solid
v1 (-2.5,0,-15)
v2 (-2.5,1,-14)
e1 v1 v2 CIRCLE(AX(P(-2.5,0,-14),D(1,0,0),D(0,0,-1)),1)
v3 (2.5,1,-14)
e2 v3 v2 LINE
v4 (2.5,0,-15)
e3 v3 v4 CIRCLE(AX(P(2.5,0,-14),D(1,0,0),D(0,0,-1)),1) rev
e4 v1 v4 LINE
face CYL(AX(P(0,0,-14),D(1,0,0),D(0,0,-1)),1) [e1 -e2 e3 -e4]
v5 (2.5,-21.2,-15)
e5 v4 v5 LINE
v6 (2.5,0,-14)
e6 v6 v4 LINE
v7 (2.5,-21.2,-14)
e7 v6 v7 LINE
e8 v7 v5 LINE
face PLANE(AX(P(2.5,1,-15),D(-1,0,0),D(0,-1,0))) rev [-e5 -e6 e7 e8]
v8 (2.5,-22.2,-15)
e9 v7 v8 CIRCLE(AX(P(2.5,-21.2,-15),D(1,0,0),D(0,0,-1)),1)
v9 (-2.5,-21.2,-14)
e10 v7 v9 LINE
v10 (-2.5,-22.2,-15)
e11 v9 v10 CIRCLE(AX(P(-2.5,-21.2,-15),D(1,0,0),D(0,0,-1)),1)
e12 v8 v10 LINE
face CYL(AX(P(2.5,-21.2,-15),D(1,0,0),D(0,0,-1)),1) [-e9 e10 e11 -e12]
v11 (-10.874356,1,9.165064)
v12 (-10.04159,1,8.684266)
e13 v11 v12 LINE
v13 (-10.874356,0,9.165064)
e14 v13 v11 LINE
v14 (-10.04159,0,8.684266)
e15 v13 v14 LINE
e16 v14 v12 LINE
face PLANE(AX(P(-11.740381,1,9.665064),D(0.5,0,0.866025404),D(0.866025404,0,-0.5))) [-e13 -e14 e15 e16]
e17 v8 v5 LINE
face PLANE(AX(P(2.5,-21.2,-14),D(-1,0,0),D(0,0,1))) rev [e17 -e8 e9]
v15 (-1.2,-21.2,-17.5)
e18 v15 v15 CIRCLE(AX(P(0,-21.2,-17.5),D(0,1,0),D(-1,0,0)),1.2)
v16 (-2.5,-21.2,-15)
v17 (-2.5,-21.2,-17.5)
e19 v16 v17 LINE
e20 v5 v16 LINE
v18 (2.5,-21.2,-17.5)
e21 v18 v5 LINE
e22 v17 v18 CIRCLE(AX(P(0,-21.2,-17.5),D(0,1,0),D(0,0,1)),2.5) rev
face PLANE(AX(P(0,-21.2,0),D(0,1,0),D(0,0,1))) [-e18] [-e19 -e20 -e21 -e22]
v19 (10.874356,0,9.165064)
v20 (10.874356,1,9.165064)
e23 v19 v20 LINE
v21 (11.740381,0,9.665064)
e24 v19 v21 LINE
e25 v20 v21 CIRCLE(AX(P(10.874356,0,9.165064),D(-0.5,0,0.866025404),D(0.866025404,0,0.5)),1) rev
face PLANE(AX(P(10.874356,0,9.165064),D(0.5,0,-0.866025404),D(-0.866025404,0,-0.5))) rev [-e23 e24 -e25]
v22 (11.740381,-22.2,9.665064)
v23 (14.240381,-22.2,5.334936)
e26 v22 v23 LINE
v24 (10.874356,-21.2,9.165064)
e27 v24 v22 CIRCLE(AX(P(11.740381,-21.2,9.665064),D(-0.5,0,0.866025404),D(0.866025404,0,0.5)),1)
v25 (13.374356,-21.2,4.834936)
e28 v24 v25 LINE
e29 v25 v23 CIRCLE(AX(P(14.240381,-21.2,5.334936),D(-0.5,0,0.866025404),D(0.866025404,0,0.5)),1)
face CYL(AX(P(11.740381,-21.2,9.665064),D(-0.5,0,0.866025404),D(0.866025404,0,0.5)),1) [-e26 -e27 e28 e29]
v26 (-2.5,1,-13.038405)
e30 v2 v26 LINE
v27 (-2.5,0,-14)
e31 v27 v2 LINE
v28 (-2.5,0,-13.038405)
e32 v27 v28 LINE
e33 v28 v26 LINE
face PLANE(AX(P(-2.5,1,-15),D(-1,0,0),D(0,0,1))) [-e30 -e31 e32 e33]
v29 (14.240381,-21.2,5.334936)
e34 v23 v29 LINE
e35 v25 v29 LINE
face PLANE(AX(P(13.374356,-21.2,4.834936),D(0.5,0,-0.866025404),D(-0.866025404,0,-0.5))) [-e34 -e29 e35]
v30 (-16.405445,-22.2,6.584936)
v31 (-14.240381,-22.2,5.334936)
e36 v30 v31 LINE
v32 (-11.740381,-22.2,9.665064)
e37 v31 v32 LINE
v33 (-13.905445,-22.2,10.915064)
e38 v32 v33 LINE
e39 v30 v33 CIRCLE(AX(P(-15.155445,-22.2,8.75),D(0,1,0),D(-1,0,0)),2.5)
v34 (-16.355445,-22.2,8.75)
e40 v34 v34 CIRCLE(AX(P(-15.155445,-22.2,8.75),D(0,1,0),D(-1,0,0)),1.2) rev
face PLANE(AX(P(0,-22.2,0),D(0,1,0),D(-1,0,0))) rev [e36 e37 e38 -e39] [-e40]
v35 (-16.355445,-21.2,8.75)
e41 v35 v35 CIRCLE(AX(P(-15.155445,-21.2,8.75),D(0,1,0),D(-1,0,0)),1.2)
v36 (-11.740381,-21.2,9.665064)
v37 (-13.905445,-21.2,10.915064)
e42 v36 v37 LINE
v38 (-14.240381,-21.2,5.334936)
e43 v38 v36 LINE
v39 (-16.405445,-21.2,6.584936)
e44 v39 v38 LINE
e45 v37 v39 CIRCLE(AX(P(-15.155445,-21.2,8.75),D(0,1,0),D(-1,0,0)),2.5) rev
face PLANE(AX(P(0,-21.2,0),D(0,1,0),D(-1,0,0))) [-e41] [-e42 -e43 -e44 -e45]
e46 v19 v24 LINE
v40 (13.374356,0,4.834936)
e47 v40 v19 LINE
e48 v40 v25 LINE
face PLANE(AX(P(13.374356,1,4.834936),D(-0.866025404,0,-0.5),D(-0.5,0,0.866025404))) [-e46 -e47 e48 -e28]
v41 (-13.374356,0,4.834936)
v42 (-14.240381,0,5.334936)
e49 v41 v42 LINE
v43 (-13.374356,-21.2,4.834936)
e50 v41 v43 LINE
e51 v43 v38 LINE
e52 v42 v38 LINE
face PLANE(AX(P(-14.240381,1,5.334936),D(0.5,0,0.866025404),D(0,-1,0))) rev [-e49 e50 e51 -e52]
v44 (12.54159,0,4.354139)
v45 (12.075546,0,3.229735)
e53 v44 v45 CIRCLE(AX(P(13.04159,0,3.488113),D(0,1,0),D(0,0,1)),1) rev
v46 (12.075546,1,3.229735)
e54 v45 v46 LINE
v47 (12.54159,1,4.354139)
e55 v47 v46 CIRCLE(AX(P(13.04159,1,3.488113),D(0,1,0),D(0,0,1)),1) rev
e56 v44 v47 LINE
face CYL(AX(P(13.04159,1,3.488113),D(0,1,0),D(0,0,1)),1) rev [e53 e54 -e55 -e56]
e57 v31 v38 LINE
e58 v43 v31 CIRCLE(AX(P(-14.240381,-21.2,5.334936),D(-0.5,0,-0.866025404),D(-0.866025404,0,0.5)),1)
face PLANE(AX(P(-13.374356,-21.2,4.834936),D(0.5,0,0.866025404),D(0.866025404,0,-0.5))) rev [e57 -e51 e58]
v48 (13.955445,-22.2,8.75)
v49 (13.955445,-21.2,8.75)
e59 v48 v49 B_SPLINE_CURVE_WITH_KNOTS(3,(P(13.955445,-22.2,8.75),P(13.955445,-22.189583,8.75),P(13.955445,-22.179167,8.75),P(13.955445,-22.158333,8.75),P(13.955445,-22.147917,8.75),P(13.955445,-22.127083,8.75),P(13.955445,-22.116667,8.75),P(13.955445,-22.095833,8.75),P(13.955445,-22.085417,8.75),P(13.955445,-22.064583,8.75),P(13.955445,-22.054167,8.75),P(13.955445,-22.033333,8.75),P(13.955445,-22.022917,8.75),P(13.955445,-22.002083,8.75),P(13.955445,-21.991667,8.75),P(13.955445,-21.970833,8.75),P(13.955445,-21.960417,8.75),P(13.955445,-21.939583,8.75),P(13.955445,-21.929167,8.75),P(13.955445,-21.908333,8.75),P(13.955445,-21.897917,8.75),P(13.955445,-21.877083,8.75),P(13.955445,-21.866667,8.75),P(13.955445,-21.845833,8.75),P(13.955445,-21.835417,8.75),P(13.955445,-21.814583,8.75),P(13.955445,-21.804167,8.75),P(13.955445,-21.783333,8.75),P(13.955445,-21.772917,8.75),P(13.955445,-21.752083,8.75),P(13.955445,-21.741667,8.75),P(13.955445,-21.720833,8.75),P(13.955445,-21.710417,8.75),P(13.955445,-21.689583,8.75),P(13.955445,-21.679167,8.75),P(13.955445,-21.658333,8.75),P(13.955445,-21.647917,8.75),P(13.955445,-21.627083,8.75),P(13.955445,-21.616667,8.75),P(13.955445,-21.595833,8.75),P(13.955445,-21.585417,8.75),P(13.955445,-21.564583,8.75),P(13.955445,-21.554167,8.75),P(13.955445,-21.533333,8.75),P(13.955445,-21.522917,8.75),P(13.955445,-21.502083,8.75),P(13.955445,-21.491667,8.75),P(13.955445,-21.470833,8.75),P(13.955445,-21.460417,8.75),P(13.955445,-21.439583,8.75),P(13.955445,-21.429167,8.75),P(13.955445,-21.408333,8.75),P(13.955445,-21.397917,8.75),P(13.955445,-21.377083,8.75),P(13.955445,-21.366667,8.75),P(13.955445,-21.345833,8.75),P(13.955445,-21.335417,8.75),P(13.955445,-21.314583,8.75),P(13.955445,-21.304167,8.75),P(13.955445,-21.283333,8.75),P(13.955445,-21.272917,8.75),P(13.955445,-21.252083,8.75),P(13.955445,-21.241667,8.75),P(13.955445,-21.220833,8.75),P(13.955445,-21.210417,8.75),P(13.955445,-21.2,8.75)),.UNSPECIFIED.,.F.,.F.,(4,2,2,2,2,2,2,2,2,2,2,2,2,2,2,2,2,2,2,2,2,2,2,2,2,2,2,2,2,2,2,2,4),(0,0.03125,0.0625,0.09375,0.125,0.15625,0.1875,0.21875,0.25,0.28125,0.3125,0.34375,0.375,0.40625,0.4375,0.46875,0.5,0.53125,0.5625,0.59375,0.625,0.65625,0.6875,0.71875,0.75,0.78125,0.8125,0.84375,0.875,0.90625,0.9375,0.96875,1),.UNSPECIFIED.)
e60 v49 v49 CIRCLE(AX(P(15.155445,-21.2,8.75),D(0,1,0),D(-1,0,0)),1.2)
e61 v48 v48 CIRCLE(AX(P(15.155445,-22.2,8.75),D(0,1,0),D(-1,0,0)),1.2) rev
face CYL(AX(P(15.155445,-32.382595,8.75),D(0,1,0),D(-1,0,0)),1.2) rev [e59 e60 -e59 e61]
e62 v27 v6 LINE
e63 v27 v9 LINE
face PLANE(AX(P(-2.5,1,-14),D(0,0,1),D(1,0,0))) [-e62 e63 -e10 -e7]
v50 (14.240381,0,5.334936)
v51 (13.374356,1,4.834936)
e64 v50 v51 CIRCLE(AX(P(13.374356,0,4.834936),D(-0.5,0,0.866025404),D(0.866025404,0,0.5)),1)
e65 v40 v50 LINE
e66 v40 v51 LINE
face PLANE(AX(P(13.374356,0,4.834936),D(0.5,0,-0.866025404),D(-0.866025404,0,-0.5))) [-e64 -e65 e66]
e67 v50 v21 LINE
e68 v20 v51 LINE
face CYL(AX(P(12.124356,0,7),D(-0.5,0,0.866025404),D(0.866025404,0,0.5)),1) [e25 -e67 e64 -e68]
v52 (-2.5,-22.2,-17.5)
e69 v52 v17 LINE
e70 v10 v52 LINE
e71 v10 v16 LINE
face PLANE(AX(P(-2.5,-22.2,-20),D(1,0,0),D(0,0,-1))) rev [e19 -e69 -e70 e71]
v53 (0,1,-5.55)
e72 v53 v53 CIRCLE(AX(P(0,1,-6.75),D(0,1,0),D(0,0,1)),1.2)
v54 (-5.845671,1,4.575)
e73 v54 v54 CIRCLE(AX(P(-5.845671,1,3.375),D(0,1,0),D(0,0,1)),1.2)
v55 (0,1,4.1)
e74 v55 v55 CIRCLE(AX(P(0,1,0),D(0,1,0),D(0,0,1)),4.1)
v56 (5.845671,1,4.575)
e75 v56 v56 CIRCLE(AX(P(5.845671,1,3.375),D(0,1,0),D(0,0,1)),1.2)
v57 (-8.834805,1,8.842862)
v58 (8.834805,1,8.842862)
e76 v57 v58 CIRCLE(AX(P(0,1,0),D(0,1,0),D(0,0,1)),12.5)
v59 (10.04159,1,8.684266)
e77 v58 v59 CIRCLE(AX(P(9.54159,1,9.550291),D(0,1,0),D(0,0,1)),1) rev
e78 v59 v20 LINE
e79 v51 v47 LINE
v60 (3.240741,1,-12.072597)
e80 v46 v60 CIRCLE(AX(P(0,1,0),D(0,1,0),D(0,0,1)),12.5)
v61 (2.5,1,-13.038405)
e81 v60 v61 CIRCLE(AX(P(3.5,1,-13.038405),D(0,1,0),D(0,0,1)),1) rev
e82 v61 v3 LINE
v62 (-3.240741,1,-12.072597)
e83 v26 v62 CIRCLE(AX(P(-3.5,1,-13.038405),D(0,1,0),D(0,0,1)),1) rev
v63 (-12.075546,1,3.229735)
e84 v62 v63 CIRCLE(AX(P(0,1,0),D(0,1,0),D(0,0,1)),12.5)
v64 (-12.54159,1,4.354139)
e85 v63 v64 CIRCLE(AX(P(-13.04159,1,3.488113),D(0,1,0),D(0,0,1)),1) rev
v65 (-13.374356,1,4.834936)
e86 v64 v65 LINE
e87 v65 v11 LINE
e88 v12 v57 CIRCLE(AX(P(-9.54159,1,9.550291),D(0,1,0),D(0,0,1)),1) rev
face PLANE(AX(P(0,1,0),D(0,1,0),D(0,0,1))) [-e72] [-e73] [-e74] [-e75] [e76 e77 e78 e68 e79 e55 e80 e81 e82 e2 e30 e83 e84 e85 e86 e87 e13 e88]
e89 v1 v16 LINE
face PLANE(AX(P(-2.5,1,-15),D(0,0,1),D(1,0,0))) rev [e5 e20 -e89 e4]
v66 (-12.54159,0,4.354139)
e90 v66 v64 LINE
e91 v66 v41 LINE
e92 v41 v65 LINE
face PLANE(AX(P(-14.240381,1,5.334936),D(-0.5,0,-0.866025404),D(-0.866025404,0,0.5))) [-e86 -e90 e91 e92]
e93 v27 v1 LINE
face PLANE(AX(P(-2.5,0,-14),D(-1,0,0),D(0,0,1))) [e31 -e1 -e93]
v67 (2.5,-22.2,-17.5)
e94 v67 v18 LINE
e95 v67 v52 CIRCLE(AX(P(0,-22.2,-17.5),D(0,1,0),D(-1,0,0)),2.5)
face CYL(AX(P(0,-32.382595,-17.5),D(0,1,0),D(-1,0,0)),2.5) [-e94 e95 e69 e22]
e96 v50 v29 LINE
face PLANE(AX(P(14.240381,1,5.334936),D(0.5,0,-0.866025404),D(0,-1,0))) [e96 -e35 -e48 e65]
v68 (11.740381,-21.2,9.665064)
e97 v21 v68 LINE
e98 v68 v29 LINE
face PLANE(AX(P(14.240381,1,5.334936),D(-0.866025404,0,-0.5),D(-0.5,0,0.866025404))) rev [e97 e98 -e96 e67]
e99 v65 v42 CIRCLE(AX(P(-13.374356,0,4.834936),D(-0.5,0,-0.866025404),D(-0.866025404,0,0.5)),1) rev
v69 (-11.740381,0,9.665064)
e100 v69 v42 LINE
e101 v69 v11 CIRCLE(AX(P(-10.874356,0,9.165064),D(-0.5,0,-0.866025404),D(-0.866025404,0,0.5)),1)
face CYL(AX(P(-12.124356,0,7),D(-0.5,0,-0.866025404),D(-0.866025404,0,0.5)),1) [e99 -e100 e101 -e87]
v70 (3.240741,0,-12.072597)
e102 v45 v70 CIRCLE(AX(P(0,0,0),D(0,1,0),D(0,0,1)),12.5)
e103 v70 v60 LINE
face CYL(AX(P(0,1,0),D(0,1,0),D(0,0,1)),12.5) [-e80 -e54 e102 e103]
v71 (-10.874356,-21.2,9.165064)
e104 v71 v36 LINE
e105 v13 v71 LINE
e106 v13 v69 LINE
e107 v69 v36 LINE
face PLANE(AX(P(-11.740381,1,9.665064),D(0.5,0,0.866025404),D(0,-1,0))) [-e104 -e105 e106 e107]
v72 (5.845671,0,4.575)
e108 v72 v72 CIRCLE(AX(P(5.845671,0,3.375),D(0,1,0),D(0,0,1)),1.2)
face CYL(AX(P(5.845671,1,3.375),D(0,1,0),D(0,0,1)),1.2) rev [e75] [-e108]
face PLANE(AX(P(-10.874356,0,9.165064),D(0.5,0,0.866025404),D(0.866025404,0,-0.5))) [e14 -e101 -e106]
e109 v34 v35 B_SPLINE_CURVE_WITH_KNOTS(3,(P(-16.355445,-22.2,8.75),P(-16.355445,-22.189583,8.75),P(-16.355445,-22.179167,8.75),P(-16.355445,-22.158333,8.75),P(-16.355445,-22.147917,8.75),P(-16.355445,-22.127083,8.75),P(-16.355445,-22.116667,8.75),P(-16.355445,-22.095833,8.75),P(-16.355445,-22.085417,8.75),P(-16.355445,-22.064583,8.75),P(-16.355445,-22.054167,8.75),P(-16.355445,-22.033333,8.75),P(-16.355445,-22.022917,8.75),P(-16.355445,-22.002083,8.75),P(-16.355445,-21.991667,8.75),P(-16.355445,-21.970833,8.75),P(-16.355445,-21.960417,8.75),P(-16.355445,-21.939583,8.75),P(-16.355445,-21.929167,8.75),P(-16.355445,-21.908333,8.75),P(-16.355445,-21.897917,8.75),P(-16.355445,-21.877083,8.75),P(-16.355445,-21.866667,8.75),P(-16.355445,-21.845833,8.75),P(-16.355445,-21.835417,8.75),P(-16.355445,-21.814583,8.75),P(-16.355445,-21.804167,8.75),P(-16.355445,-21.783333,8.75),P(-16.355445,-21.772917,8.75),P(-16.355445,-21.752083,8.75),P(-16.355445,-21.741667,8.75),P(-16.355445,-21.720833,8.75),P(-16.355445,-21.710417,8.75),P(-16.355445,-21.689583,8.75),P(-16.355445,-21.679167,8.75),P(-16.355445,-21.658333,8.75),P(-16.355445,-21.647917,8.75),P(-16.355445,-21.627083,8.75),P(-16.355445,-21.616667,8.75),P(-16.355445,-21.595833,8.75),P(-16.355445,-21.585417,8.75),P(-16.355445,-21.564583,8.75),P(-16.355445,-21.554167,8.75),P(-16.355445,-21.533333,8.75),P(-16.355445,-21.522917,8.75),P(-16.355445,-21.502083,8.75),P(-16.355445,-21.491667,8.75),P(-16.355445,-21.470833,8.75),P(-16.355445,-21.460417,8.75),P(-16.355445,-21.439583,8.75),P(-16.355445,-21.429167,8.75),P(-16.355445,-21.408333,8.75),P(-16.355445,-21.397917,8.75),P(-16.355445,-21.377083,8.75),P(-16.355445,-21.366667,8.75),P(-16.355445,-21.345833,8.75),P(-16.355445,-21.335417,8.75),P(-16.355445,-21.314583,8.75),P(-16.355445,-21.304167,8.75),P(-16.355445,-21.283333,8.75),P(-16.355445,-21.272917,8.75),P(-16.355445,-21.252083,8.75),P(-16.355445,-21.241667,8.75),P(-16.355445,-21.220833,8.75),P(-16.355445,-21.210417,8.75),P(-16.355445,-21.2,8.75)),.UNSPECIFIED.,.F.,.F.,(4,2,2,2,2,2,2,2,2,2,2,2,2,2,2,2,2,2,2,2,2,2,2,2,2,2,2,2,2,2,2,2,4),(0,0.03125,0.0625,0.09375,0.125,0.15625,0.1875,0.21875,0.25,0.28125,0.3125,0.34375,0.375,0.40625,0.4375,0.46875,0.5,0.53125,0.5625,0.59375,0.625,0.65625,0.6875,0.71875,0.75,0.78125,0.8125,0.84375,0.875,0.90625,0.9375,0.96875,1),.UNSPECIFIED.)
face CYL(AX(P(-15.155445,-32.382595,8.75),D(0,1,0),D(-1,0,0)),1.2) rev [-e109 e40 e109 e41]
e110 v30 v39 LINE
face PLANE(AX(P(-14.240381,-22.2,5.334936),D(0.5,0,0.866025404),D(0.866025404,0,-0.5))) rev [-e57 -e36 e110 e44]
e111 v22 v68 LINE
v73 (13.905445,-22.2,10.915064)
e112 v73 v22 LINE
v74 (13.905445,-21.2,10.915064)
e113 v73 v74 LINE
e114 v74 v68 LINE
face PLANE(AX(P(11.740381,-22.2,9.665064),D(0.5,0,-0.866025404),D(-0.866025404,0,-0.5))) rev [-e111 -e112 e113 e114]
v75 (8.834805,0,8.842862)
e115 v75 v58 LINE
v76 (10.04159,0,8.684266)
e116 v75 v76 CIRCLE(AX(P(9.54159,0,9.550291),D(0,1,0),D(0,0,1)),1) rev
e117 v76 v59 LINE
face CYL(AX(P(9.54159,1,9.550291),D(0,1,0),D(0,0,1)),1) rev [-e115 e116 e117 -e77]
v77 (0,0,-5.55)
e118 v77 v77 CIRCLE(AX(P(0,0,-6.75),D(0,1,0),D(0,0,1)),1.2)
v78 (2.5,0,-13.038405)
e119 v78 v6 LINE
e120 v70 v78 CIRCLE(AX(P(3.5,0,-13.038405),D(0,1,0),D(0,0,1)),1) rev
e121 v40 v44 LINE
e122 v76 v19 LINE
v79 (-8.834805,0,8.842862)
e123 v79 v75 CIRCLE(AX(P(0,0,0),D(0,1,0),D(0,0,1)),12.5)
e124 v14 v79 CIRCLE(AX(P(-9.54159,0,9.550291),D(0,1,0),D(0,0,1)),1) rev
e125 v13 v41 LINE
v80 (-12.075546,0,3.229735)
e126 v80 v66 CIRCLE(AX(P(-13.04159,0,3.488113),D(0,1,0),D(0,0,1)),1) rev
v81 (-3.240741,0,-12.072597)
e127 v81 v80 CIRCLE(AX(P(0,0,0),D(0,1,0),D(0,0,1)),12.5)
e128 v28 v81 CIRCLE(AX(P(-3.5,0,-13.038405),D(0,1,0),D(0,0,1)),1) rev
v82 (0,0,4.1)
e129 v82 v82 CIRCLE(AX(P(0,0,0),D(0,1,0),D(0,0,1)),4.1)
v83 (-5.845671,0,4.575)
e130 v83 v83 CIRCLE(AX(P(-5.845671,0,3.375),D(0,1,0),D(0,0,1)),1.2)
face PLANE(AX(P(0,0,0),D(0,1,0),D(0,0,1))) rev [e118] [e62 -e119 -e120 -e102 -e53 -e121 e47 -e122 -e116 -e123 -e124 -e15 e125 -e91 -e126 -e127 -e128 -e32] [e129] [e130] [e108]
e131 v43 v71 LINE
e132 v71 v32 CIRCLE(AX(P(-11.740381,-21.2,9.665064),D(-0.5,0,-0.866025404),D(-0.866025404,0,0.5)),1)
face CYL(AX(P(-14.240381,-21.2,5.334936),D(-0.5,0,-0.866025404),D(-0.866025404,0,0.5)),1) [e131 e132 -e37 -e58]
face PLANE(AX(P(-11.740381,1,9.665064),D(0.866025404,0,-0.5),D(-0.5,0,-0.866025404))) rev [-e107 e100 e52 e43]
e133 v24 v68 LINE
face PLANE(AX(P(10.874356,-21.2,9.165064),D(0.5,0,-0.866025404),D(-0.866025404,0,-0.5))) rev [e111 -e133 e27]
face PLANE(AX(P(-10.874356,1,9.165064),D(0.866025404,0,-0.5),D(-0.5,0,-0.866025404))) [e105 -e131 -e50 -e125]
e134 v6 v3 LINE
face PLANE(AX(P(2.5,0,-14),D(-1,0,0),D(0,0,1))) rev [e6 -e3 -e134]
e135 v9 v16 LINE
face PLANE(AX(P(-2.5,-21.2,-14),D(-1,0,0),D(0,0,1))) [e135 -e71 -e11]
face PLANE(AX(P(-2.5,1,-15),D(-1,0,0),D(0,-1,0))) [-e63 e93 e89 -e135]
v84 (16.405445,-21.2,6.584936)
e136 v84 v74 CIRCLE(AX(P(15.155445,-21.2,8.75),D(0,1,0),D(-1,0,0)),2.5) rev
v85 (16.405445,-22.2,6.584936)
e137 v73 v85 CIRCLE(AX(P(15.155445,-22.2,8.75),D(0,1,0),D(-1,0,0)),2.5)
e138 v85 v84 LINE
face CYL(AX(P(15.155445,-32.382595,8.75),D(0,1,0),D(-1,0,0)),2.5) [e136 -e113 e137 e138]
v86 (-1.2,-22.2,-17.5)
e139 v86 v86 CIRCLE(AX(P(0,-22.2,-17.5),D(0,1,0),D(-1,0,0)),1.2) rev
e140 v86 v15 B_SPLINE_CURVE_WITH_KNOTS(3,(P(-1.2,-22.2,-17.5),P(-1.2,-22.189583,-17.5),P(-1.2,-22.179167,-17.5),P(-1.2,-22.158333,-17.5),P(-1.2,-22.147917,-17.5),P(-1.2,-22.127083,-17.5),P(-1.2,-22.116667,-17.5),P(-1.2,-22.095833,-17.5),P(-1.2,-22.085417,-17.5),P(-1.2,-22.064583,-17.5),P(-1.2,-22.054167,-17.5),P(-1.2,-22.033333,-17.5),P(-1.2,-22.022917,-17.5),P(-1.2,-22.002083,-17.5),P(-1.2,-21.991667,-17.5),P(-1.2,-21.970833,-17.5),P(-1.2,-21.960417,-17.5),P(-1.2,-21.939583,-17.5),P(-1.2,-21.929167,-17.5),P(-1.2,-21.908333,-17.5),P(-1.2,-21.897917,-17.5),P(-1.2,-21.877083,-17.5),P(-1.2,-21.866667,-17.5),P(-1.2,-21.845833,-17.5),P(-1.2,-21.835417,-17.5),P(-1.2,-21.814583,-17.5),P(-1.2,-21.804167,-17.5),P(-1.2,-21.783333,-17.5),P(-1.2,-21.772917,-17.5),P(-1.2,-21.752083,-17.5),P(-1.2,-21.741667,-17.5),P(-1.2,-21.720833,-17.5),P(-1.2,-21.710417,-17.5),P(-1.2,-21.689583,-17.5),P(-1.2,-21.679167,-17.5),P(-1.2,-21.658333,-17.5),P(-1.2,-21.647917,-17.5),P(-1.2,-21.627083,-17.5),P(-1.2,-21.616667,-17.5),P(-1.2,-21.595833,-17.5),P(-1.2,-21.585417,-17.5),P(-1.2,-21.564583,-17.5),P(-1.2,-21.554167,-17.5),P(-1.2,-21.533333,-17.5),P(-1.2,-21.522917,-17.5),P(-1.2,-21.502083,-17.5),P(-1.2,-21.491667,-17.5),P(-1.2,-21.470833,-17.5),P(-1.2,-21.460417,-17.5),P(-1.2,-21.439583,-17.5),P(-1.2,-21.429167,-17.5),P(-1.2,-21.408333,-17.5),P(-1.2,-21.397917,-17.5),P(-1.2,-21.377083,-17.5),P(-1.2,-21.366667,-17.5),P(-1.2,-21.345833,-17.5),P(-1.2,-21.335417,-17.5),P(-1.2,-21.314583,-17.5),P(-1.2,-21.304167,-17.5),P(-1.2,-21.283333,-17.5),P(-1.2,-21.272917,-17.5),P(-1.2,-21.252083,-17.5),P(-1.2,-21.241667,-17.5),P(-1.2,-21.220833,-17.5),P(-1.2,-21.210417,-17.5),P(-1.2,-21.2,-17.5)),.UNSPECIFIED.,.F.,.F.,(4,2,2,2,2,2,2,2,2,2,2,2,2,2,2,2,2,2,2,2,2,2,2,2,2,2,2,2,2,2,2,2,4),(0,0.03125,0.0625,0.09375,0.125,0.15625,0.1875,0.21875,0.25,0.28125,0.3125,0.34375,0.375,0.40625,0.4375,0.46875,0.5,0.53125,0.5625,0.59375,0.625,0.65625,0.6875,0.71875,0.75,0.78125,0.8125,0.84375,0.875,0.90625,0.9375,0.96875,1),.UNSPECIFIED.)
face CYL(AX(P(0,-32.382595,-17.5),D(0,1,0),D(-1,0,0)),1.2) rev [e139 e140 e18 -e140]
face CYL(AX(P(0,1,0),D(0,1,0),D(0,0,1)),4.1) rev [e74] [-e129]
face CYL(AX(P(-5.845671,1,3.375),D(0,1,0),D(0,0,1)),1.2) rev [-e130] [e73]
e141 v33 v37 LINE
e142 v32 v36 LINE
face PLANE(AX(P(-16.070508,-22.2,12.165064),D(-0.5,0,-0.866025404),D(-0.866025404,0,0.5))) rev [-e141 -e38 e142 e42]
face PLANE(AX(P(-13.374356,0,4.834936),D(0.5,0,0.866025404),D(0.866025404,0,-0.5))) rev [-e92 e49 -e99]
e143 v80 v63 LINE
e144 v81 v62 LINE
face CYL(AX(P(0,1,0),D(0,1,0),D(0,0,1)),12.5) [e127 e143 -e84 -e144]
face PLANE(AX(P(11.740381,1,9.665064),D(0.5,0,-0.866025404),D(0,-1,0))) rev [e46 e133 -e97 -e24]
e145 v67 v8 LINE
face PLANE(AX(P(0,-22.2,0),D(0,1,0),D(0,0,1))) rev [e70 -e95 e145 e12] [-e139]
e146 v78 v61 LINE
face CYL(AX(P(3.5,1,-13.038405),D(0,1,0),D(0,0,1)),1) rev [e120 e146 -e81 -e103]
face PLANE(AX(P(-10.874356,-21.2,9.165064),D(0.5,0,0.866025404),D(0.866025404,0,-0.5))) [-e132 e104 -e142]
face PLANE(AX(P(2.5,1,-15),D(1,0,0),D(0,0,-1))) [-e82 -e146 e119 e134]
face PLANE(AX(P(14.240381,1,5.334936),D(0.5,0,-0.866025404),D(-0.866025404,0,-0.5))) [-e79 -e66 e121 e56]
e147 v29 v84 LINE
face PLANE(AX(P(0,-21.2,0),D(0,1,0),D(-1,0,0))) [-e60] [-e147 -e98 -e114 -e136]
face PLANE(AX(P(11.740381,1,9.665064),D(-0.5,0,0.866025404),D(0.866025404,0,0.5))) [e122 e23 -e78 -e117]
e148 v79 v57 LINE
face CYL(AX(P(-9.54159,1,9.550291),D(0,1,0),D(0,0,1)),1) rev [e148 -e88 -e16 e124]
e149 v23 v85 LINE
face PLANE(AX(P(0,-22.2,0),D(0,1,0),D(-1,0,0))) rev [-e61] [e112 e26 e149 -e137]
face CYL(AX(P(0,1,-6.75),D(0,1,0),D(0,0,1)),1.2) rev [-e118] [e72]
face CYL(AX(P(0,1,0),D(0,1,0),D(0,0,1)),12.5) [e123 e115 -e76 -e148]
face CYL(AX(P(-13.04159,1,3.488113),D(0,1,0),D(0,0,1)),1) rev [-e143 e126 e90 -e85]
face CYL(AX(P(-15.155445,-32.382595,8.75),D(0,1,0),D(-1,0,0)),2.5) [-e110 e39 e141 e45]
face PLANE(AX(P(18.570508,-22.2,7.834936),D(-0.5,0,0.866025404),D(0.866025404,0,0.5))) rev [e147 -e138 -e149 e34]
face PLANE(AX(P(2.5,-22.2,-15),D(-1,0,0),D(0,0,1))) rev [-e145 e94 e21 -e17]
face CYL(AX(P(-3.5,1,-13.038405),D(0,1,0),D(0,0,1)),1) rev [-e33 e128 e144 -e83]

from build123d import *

# Parameters (mm, degrees)
ESBO_O1_R                  = 4.1
ESBO_O1_R_2                = 1.2
RESSALTO_EXTRUS_O1_DEPTH   = 1
ESBO_O2_W                  = 5
ESBO_O2_H                  = 1
RESSALTO_EXTRUS_O2_DEPTH   = 22.2
ESBO_O3_R                  = 1.2
RESSALTO_EXTRUS_O3_DEPTH   = 1
FILETE1_R                  = 1
CONVERT_SOLID4_OUTLINE_R   = 1.2
CONVERT_SOLID4_OUTLINE_R_2 = 4.1
CONVERT_SOLID4_DEPTH       = 1
CONVERT_SOLID4_START       = -21.2
CONVERT_SOLID4_2_OUTLINE_W = 5
CONVERT_SOLID4_2_OUTLINE_H = 1
CONVERT_SOLID4_2_DEPTH     = 21.2
CONVERT_SOLID4_START_2     = -2.5
CONVERT_SOLID4_3_DEPTH     = 5
CONVERT_SOLID4_4_DEPTH     = 4.999999999
CONVERT_SOLID4_5_DEPTH     = 5
CUT_EXTRUDE1_START         = -1
SKETCH18_R                 = 1.2
CUT_EXTRUDE1_DEPTH         = 1


with BuildPart() as part:
    # Esboço1 → Ressalto-extrusão1 (new body)
    with BuildSketch(Plane(origin=(0, 0, 0), x_dir=(1, 0, 0), z_dir=(0, 1, 0))):
        with BuildLine():
            Line((-2.5, 15), (-2.5, 12.247448714))
            ThreePointArc((-2.5, 12.247448714), (-10.825317547, 6.25), (-11.856601718, -3.958660847))
            Line((-11.856601718, -3.958660847), (-14.240381057, -5.334936491))
            Line((-14.240381057, -5.334936491), (-11.740381057, -9.665063509))
            Line((-11.740381057, -9.665063509), (-9.356601718, -8.288787866))
            ThreePointArc((-9.356601718, -8.288787866), (0, -12.5), (9.356601718, -8.288787866))
            Line((9.356601718, -8.288787866), (11.740381057, -9.665063509))
            Line((11.740381057, -9.665063509), (14.240381057, -5.334936491))
            Line((14.240381057, -5.334936491), (11.856601718, -3.958660847))
            ThreePointArc((11.856601718, -3.958660847), (10.825317547, 6.25), (2.5, 12.247448714))
            Line((2.5, 12.247448714), (2.5, 15))
            Line((2.5, 15), (-2.5, 15))
        make_face()
        with Locations(Location((0, 0, 0), (0, 0, 270))):
            Circle(ESBO_O1_R, mode=Mode.SUBTRACT)
        with Locations(Location((0, 6.75, 0), (0, 0, 270))):
            Circle(ESBO_O1_R_2, mode=Mode.SUBTRACT)
        with Locations(Location((5.845671476, -3.375, 0), (0, 0, 270))):
            Circle(ESBO_O1_R_2, mode=Mode.SUBTRACT)
        with Locations(Location((-5.845671476, -3.375, 0), (0, 0, 270))):
            Circle(ESBO_O1_R_2, mode=Mode.SUBTRACT)
    extrude(amount=RESSALTO_EXTRUS_O1_DEPTH)

    # Esboço2 → Ressalto-extrusão2 (add)
    with BuildSketch(Plane.XZ):
        with Locations((0, -14.5)):
            Rectangle(ESBO_O2_W, ESBO_O2_H)
        Polygon((-10.874355653, 9.165063509), (-11.740381057, 9.665063509), (-14.240381057, 5.334936491), (-13.374355653, 4.834936491), align=None)
        Polygon((13.374355653, 4.834936491), (14.240381057, 5.334936491), (11.740381057, 9.665063509), (10.874355653, 9.165063509), align=None)
    extrude(amount=RESSALTO_EXTRUS_O2_DEPTH)

    # Esboço3 → Ressalto-extrusão3 (add)
    # profile 1 of 3: a face of its own
    with BuildSketch(Plane.XZ.offset(22.2)):
        with BuildLine():
            Line((2.5, -15), (2.5, -17.5))
            ThreePointArc((2.5, -17.5), (0, -20), (-2.5, -17.5))
            Line((-2.5, -17.5), (-2.5, -15))
            Line((-2.5, -15), (2.5, -15))
        make_face()
        with Locations(Location((0, -17.5, 0), (0, 0, 270))):
            Circle(ESBO_O3_R, mode=Mode.SUBTRACT)
    # profile 2 of 3: a face of its own
    with BuildSketch(Plane.XZ.offset(22.2)):
        with BuildLine():
            Line((-11.740381057, 9.665063509), (-13.905444566, 10.915063509))
            ThreePointArc((-13.905444566, 10.915063509), (-17.320508076, 10), (-16.405444566, 6.584936491))
            Line((-16.405444566, 6.584936491), (-14.240381057, 5.334936491))
            Line((-14.240381057, 5.334936491), (-11.740381057, 9.665063509))
        make_face()
        with Locations(Location((-15.155444566, 8.75, 0), (0, 0, 270))):
            Circle(ESBO_O3_R, mode=Mode.SUBTRACT)
    # profile 3 of 3: a face of its own
    with BuildSketch(Plane.XZ.offset(22.2)):
        with BuildLine():
            Line((14.240381057, 5.334936491), (16.405444566, 6.584936491))
            ThreePointArc((16.405444566, 6.584936491), (17.320508076, 10), (13.905444566, 10.915063509))
            Line((13.905444566, 10.915063509), (11.740381057, 9.665063509))
            Line((11.740381057, 9.665063509), (14.240381057, 5.334936491))
        make_face()
        with Locations(Location((15.155444566, 8.75, 0), (0, 0, 270))):
            Circle(ESBO_O3_R, mode=Mode.SUBTRACT)
    extrude(amount=-RESSALTO_EXTRUS_O3_DEPTH)

    # Filete1
    filete1_edges = [part.edges().sort_by_distance(p)[0] for p in [
        (11.856601718, 0.5, 3.958660847),
        (2.5, 0.5, -12.247448714),
        (-2.5, 0.5, -12.247448714),
        (-11.856601718, 0.5, 3.958660847),
        (9.356601718, 0.5, 8.288787866),
        (-9.356601718, 0.5, 8.288787866),
    ]]
    fillet(filete1_edges, radius=FILETE1_R)


with BuildPart() as body_2:
    # Convert-Solid4: read off the stored shape, not the designer's step
    # Convert-Solid4 outline → Convert-Solid4 (new body)
    with BuildSketch(Plane(origin=(0, 0, 0), x_dir=(1, 0, 0), z_dir=(0, 1, 0))):
        with BuildLine():
            Line((2.5, 14), (-2.5, 14))
            Line((-2.5, 14), (-2.5, 13.03840481))
            ThreePointArc((-2.5, 13.03840481), (-2.706507952, 12.429824191), (-3.240740741, 12.072597047))
            ThreePointArc((-3.240740741, 12.072597047), (-10.825317547, 6.25), (-12.075546102, -3.229734715))
            ThreePointArc((-12.075546102, -3.229734715), (-12.11779749, -3.871007453), (-12.541589791, -4.354138896))
            Line((-12.541589791, -4.354138896), (-13.374355653, -4.834936491))
            Line((-13.374355653, -4.834936491), (-10.874355653, -9.165063509))
            Line((-10.874355653, -9.165063509), (-10.041589791, -8.684265915))
            ThreePointArc((-10.041589791, -8.684265915), (-9.411289538, -8.558816738), (-8.834805362, -8.842862332))
            ThreePointArc((-8.834805362, -8.842862332), (0, -12.5), (8.834805362, -8.842862332))
            ThreePointArc((8.834805362, -8.842862332), (9.411289538, -8.558816738), (10.041589791, -8.684265915))
            Line((10.041589791, -8.684265915), (10.874355653, -9.165063509))
            Line((10.874355653, -9.165063509), (13.374355653, -4.834936491))
            Line((13.374355653, -4.834936491), (12.541589791, -4.354138896))
            ThreePointArc((12.541589791, -4.354138896), (12.11779749, -3.871007453), (12.075546102, -3.229734715))
            ThreePointArc((12.075546102, -3.229734715), (10.825317547, 6.25), (3.240740741, 12.072597047))
            ThreePointArc((3.240740741, 12.072597047), (2.706507952, 12.429824191), (2.5, 13.03840481))
            Line((2.5, 13.03840481), (2.5, 14))
        make_face()
        with Locations((-5.845671476, -3.375)):
            Circle(CONVERT_SOLID4_OUTLINE_R, mode=Mode.SUBTRACT)
        Circle(CONVERT_SOLID4_OUTLINE_R_2, mode=Mode.SUBTRACT)
        with Locations((5.845671476, -3.375)):
            Circle(CONVERT_SOLID4_OUTLINE_R, mode=Mode.SUBTRACT)
        with Locations((0, 6.75)):
            Circle(CONVERT_SOLID4_OUTLINE_R, mode=Mode.SUBTRACT)
    extrude(amount=CONVERT_SOLID4_DEPTH)

    # Convert-Solid4 2 outline → Convert-Solid4 2 (add)
    with BuildSketch(Plane(origin=(0, 0, 0), x_dir=(1, 0, 0), z_dir=(0, 1, 0)).offset(CONVERT_SOLID4_START)):
        with Locations((0, 14.5)):
            Rectangle(CONVERT_SOLID4_2_OUTLINE_W, CONVERT_SOLID4_2_OUTLINE_H)
        Polygon((-10.874355653, -9.165063509), (-13.374355653, -4.834936491), (-14.240381057, -5.334936491), (-11.740381057, -9.665063509), align=None)
        Polygon((14.240381057, -5.334936491), (13.374355653, -4.834936491), (10.874355653, -9.165063509), (11.740381057, -9.665063509), align=None)
    extrude(amount=CONVERT_SOLID4_2_DEPTH)

    # Convert-Solid4 3 outline → Convert-Solid4 3 (add)
    with BuildSketch(Plane.YZ.offset(CONVERT_SOLID4_START_2)):
        with BuildLine():
            Line((0, -14), (0, -15))
            ThreePointArc((0, -15), (0.707106781, -14.707106781), (1, -14))
            Line((1, -14), (0, -14))
        make_face()
    extrude(amount=CONVERT_SOLID4_3_DEPTH)

    # Convert-Solid4 4 outline → Convert-Solid4 4 (add)
    with BuildSketch(Plane(origin=(0, 0, 0), x_dir=(0.866025403784438, 0, -0.500000000000001), z_dir=(0.500000000000001, 0, 0.866025403784438)).offset(CONVERT_SOLID4_START_2)):
        with BuildLine():
            ThreePointArc((-14, 1), (-14.707106781, 0.707106781), (-15, 0))
            Line((-15, 0), (-14, 0))
            Line((-14, 0), (-14, 1))
        make_face()
    extrude(amount=CONVERT_SOLID4_4_DEPTH)

    # Convert-Solid4 5 outline → Convert-Solid4 5 (add)
    with BuildSketch(Plane(origin=(0, 0, 0), x_dir=(0.8660254037844386, 0, 0.4999999999999999), z_dir=(0.4999999999999999, 0, -0.8660254037844388)).offset(CONVERT_SOLID4_START_2)):
        with BuildLine():
            ThreePointArc((14, -1), (14.707106781, -0.707106781), (15, 0))
            Line((15, 0), (14, 0))
            Line((14, 0), (14, -1))
        make_face()
    extrude(amount=CONVERT_SOLID4_5_DEPTH)

    # Edge-Flange1: read off the stored shape, not the designer's step
    # Edge-Flange1: loft between two sections, ruled curve by curve
    edge_flange1_from = [
        Edge.make_three_point_arc((-2.5, -21.2, -14), (-2.5, -21.907106781, -14.292893219), (-2.5, -22.2, -15)),
        Edge.make_line((-2.5, -22.2, -15), (-2.5, -22.2, -20)),
        Edge.make_line((-2.5, -21.2, -20), (-2.5, -21.2, -15)),
        Edge.make_line((-2.5, -21.2, -20), (-2.5, -22.2, -20)),
        Edge.make_line((-2.5, -21.2, -15), (-2.5, -21.2, -14)),
    ]
    edge_flange1_to = [
        Edge.make_three_point_arc((2.5, -21.2, -14), (2.5, -21.907106781, -14.292893219), (2.5, -22.2, -15)),
        Edge.make_line((2.5, -22.2, -15), (2.5, -22.2, -20)),
        Edge.make_line((2.5, -21.2, -20), (2.5, -21.2, -15)),
        Edge.make_line((2.5, -21.2, -20), (2.5, -22.2, -20)),
        Edge.make_line((2.5, -21.2, -15), (2.5, -21.2, -14)),
    ]
    edge_flange1 = Solid(Shell([*[Face.make_surface_from_curves(edge_flange1_from[k], edge_flange1_to[k]) for k in range(5)], Face(Wire(edge_flange1_from)), Face(Wire(edge_flange1_to))]))
    add(edge_flange1)

    # Edge-Flange1 2: loft between two sections, ruled curve by curve
    edge_flange1_2_from = [
        Edge.make_three_point_arc((-10.874355653, -21.2, 9.165063509), (-11.128008621, -21.907106781, 9.311510119), (-11.740381057, -22.2, 9.665063509)),
        Edge.make_line((-11.740381057, -22.2, 9.665063509), (-16.070508076, -22.2, 12.165063509)),
        Edge.make_line((-16.070508076, -21.2, 12.165063509), (-11.740381057, -21.2, 9.665063509)),
        Edge.make_line((-16.070508076, -21.2, 12.165063509), (-16.070508076, -22.2, 12.165063509)),
        Edge.make_line((-11.740381057, -21.2, 9.665063509), (-10.874355653, -21.2, 9.165063509)),
    ]
    edge_flange1_2_to = [
        Edge.make_three_point_arc((-13.374355653, -21.2, 4.834936491), (-13.628008621, -21.907106781, 4.9813831), (-14.240381057, -22.2, 5.334936491)),
        Edge.make_line((-14.240381057, -22.2, 5.334936491), (-18.570508076, -22.2, 7.834936491)),
        Edge.make_line((-18.570508076, -21.2, 7.834936491), (-14.240381057, -21.2, 5.334936491)),
        Edge.make_line((-18.570508076, -21.2, 7.834936491), (-18.570508076, -22.2, 7.834936491)),
        Edge.make_line((-14.240381057, -21.2, 5.334936491), (-13.374355653, -21.2, 4.834936491)),
    ]
    edge_flange1_2 = Solid(Shell([*[Face.make_surface_from_curves(edge_flange1_2_from[k], edge_flange1_2_to[k]) for k in range(5)], Face(Wire(edge_flange1_2_from)), Face(Wire(edge_flange1_2_to))]))
    add(edge_flange1_2)

    # Edge-Flange1 3: loft between two sections, ruled curve by curve
    edge_flange1_3_from = [
        Edge.make_three_point_arc((13.374355653, -21.2, 4.834936491), (13.628008621, -21.907106781, 4.9813831), (14.240381057, -22.2, 5.334936491)),
        Edge.make_line((18.570508076, -21.2, 7.834936491), (18.570508076, -22.2, 7.834936491)),
        Edge.make_line((14.240381057, -22.2, 5.334936491), (18.570508076, -22.2, 7.834936491)),
        Edge.make_line((18.570508076, -21.2, 7.834936491), (14.240381057, -21.2, 5.334936491)),
        Edge.make_line((14.240381057, -21.2, 5.334936491), (13.374355653, -21.2, 4.834936491)),
    ]
    edge_flange1_3_to = [
        Edge.make_three_point_arc((10.874355653, -21.2, 9.165063509), (11.128008621, -21.907106781, 9.311510119), (11.740381057, -22.2, 9.665063509)),
        Edge.make_line((16.070508076, -21.2, 12.165063509), (16.070508076, -22.2, 12.165063509)),
        Edge.make_line((11.740381057, -22.2, 9.665063509), (16.070508076, -22.2, 12.165063509)),
        Edge.make_line((16.070508076, -21.2, 12.165063509), (11.740381057, -21.2, 9.665063509)),
        Edge.make_line((11.740381057, -21.2, 9.665063509), (10.874355653, -21.2, 9.165063509)),
    ]
    edge_flange1_3 = Solid(Shell([*[Face.make_surface_from_curves(edge_flange1_3_from[k], edge_flange1_3_to[k]) for k in range(5)], Face(Wire(edge_flange1_3_from)), Face(Wire(edge_flange1_3_to))]))
    add(edge_flange1_3)

    # Sketch18 → Cut-Extrude1 (cut)
    with BuildSketch(Plane(origin=(0, -21.2, 0), x_dir=(1, 0, 0), z_dir=(0, 1, 0)).offset(CUT_EXTRUDE1_START)):
        with Locations(Location((-15.155444566, -8.75, 0), (0, 0, 180))):
            Circle(SKETCH18_R)
        with Locations(Location((0, 17.5, 0), (0, 0, 180))):
            Circle(SKETCH18_R)
        with Locations(Location((15.155444566, -8.75, 0), (0, 0, 180))):
            Circle(SKETCH18_R)
        with BuildLine():
            Line((-16.405444566, -6.584936491), (-16.905444566, -5.718911087))
            Line((-16.905444566, -5.718911087), (-19.936533479, -7.468911087))
            Line((-19.936533479, -7.468911087), (-16.436533479, -13.531088913))
            Line((-16.436533479, -13.531088913), (-13.405444566, -11.781088913))
            Line((-13.405444566, -11.781088913), (-13.905444566, -10.915063509))
            ThreePointArc((-13.905444566, -10.915063509), (-17.320508076, -10), (-16.405444566, -6.584936491))
        make_face()
        with BuildLine():
            Line((2.5, 17.5), (3.5, 17.5))
            Line((3.5, 17.5), (3.5, 21))
            Line((3.5, 21), (-3.5, 21))
            Line((-3.5, 21), (-3.5, 17.5))
            Line((-3.5, 17.5), (-2.5, 17.5))
            ThreePointArc((-2.5, 17.5), (0, 20), (2.5, 17.5))
        make_face()
        with BuildLine():
            Line((13.905444566, -10.915063509), (13.405444566, -11.781088913))
            Line((13.405444566, -11.781088913), (16.436533479, -13.531088913))
            Line((16.436533479, -13.531088913), (19.936533479, -7.468911087))
            Line((19.936533479, -7.468911087), (16.905444566, -5.718911087))
            Line((16.905444566, -5.718911087), (16.405444566, -6.584936491))
            ThreePointArc((16.405444566, -6.584936491), (17.320508076, -10), (13.905444566, -10.915063509))
        make_face()
    extrude(amount=CUT_EXTRUDE1_DEPTH, mode=Mode.SUBTRACT)


solid = body_2.part
